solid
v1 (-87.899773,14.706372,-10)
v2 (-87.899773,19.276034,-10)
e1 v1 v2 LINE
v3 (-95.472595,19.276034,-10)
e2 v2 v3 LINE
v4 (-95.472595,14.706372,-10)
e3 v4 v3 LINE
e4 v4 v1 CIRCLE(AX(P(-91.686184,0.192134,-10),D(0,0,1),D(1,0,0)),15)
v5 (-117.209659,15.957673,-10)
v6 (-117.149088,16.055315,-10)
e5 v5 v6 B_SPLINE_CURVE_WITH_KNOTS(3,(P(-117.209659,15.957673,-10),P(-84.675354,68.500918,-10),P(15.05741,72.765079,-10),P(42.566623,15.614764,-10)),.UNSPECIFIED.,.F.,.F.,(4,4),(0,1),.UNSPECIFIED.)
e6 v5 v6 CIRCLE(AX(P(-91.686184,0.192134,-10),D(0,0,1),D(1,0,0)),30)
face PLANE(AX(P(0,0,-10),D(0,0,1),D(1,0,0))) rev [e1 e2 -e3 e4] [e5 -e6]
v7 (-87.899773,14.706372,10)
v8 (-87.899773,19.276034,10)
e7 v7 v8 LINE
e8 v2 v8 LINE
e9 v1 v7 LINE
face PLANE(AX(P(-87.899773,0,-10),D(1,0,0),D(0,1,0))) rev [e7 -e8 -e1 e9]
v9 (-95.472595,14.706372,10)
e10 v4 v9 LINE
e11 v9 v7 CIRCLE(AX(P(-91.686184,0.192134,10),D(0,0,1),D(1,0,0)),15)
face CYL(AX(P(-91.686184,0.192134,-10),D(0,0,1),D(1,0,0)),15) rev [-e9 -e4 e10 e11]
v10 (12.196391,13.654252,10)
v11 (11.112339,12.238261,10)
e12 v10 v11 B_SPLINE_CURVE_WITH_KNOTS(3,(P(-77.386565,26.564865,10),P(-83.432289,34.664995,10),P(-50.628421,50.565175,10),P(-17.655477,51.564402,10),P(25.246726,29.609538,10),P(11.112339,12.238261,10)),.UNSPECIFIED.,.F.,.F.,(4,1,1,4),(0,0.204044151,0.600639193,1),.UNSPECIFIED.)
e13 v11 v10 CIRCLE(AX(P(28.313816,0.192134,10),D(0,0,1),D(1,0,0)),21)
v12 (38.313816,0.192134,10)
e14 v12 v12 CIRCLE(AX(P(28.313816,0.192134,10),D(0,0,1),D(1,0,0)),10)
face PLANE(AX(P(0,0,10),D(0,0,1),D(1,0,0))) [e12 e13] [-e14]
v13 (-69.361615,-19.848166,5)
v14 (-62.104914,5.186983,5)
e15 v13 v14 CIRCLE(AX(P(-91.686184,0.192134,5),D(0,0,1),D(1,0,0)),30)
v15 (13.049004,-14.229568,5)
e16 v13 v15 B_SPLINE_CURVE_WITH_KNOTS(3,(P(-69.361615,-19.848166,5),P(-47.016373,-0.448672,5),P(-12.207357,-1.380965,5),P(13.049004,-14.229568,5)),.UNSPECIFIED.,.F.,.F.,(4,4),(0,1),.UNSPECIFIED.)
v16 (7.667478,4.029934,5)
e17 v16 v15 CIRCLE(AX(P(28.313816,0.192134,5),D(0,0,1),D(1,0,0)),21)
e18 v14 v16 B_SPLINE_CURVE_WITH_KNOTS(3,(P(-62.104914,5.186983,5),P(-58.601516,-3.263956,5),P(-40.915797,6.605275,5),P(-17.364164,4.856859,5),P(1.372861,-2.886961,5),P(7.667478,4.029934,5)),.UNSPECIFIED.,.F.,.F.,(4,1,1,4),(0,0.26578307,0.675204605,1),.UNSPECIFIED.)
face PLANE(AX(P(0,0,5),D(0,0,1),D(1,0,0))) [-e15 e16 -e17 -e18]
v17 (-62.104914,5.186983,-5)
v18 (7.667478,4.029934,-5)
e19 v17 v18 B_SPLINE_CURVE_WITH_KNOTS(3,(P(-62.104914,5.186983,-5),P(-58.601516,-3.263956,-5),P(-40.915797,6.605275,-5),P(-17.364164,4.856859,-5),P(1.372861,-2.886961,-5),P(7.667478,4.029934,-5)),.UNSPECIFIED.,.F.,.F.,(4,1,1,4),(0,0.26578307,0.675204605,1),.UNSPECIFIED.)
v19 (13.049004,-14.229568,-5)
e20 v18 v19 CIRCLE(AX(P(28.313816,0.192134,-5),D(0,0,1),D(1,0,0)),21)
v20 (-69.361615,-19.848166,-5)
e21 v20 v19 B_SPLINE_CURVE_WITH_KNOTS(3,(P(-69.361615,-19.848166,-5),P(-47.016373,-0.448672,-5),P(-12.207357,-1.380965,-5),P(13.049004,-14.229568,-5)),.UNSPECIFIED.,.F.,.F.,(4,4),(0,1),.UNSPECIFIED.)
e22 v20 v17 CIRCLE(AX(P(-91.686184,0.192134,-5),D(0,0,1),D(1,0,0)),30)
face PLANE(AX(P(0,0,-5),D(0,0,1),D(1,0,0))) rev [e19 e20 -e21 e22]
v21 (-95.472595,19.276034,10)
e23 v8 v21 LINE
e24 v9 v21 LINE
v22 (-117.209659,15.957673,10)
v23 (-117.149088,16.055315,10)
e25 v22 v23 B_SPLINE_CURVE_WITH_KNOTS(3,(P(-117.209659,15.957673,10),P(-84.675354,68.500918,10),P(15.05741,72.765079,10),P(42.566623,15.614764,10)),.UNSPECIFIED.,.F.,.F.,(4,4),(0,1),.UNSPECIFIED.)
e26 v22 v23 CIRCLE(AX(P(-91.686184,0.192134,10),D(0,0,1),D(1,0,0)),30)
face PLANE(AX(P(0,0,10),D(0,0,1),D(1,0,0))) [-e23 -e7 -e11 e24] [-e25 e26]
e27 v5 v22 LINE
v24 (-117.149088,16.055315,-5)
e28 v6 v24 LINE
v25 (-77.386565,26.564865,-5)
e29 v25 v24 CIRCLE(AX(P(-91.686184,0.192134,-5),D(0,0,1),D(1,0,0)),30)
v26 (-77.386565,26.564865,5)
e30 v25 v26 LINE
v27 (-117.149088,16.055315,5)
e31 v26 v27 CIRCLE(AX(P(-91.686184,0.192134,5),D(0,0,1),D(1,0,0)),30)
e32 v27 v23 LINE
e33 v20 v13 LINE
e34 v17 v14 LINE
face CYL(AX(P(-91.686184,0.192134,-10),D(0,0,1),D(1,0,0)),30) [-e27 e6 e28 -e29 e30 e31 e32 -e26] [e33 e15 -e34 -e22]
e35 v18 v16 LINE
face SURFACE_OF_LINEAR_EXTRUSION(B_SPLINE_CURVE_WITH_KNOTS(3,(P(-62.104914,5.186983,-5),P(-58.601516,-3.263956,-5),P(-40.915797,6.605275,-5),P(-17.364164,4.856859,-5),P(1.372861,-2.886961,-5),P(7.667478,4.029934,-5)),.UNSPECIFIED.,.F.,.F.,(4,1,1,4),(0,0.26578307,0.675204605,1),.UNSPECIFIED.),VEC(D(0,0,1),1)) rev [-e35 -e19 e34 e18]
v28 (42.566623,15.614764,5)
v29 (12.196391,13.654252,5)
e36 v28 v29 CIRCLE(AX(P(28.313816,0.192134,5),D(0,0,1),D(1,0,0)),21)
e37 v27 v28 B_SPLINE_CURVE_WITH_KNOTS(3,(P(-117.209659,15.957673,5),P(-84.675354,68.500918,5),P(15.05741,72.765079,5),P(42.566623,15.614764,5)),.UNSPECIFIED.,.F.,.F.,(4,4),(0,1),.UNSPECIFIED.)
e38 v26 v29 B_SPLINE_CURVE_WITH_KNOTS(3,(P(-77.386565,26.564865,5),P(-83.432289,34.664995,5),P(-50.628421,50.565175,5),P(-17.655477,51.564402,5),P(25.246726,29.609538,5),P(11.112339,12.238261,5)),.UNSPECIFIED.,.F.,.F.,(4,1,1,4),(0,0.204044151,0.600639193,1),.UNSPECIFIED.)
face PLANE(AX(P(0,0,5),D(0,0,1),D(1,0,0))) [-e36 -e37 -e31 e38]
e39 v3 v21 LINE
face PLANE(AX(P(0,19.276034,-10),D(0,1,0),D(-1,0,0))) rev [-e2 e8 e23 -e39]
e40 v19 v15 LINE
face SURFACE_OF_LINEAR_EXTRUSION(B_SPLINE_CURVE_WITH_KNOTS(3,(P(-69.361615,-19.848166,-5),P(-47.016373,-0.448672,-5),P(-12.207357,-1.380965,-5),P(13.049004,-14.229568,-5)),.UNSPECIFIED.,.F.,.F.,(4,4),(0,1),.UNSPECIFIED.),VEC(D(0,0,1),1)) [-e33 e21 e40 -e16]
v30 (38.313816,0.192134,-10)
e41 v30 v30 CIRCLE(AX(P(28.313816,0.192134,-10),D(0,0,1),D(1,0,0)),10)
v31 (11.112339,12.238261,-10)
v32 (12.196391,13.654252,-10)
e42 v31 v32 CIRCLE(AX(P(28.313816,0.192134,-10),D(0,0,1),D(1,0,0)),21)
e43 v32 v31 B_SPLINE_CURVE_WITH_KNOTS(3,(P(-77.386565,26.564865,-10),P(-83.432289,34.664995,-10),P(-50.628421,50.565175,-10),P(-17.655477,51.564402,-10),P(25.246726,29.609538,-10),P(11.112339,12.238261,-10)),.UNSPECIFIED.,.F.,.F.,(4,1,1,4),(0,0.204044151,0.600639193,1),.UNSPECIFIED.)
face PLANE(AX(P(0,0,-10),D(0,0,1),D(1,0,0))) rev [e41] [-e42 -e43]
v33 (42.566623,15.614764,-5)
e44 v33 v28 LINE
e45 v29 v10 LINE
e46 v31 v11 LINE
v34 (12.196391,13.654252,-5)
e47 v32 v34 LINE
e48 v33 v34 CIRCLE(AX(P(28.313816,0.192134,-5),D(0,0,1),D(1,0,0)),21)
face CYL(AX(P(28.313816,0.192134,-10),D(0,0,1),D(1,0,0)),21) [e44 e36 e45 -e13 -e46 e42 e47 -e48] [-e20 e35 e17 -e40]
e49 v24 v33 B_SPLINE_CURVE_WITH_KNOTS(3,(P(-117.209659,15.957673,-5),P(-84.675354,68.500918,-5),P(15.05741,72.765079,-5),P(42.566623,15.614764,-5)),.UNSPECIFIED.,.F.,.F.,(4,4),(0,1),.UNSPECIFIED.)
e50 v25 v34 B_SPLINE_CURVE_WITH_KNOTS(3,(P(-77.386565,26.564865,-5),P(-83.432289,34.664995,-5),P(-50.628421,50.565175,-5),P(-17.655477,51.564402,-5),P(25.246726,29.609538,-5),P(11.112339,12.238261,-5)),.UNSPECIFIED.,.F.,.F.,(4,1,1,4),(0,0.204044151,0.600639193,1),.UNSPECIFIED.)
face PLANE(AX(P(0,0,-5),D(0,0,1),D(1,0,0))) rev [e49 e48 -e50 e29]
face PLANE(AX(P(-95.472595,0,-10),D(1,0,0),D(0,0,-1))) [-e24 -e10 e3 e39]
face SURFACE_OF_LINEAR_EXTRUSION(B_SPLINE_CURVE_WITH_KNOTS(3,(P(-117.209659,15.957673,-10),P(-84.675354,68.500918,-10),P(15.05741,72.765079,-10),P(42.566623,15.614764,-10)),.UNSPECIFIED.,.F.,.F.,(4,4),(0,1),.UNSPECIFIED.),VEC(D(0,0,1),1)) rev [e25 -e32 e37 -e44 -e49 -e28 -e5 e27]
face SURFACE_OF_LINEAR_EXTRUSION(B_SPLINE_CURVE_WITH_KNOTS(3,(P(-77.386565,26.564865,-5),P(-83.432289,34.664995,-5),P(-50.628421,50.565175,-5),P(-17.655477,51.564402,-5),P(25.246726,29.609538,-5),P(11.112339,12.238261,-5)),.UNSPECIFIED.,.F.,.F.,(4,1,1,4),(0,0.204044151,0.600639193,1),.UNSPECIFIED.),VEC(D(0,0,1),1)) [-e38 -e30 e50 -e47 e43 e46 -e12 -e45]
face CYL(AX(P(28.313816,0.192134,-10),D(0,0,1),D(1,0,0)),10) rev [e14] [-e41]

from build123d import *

# Parameters (mm, degrees)
BOSS_EXTRUDE3_DEPTH      = 10
BOSS_EXTRUDE3_DEPTH_BACK = 10
SKETCH1_R                = 30
BOSS_EXTRUDE4_DEPTH      = 10
BOSS_EXTRUDE4_DEPTH_BACK = 10
SKETCH1_6_R              = 10
BOSS_EXTRUDE5_START      = -5
BOSS_EXTRUDE5_DEPTH      = 10
BOSS_EXTRUDE6_DEPTH      = 5
BOSS_EXTRUDE6_DEPTH_BACK = 5


# Read off the part's stored shape, not the designer's step: Boss-Extrude5
with BuildPart() as part:
    # Sketch1 → Boss-Extrude3 (new, two sides: drawn at the far end of the back side and taken through both)
    with BuildSketch(Plane.XY.offset(-BOSS_EXTRUDE3_DEPTH_BACK)):
        with Locations((-91.686183624, 0.192134417)):
            Circle(SKETCH1_R)
        with BuildLine():
            Line((-87.89977254, 14.706371948), (-87.89977254, 19.276034186))
            Line((-87.89977254, 19.276034186), (-95.472594708, 19.276034186))
            Line((-95.472594708, 19.276034186), (-95.472594708, 14.706371948))
            ThreePointArc((-95.472594708, 14.706371948), (-91.686183624, -14.807865583), (-87.89977254, 14.706371948))
        make_face(mode=Mode.SUBTRACT)
    extrude(amount=BOSS_EXTRUDE3_DEPTH + BOSS_EXTRUDE3_DEPTH_BACK)



with BuildPart() as body_2:
    # Sketch1<6> → Boss-Extrude4 (new, two sides: drawn at the far end of the back side and taken through both)
    with BuildSketch(Plane.XY.offset(-BOSS_EXTRUDE4_DEPTH_BACK)):
        with BuildLine():
            ThreePointArc((11.112339015, 12.238261455), (8.949972375, 8.318729369), (7.667477785, 4.02993363))
            ThreePointArc((7.667477785, 4.02993363), (8.170454057, -5.744611701), (13.049003536, -14.229567596))
            ThreePointArc((13.049003536, -14.229567596), (36.073936554, -19.321464298), (49.313816376, 0.192134417))
            ThreePointArc((49.313816376, 0.192134417), (47.553215185, 8.609113298), (42.566622712, 15.614764269))
            ThreePointArc((42.566622712, 15.614764269), (26.961003361, 21.148515234), (12.196391219, 13.65425187))
            add(Edge.make_bspline(
                [(12.196391219, 13.65425187), (11.861354172, 13.187034207), (11.500278102, 12.715041734), (11.112339015, 12.238261455)],
                knots=[0.989038954, 0.989038954, 0.989038954, 0.989038954, 1, 1, 1, 1], degree=3))
        make_face()
        with Locations((28.313816376, 0.192134417)):
            Circle(SKETCH1_6_R, mode=Mode.SUBTRACT)
    extrude(amount=BOSS_EXTRUDE4_DEPTH + BOSS_EXTRUDE4_DEPTH_BACK)


with BuildPart() as part_1:
    add(part.part)

    add(body_2.part)  # Boss-Extrude5 merges body 2
    # Boss-Extrude5 outline → Boss-Extrude5 (add)
    with BuildSketch(Plane.XY.offset(BOSS_EXTRUDE5_START)):
        with BuildLine():
            add(Edge.make_bspline(
                [(-117.149088001, 16.055315078), (-84.551754221, 68.506180692), (15.074459949, 72.729657691), (42.566622712, 15.614764269)],
                knots=[0.000619794, 0.000619794, 0.000619794, 0.000619794, 1, 1, 1, 1], degree=3))
            ThreePointArc((-117.149088001, 16.055315078), (-99.352173325, 29.196144551), (-77.386565231, 26.564864967))
            add(Edge.make_bspline(
                [(-77.386565231, 26.564864967), (-83.432288651, 34.664995437), (-50.628420979, 50.565174626), (-18.016895415, 51.553449374), (24.068279094, 30.209900729), (12.196391219, 13.65425187)],
                knots=[0, 0, 0, 0, 0.204044151, 0.600639193, 0.989038954, 0.989038954, 0.989038954, 0.989038954], degree=3))
            ThreePointArc((12.196391219, 13.65425187), (26.961003361, 21.148515233), (42.566622712, 15.614764269))
        make_face()
    extrude(amount=BOSS_EXTRUDE5_DEPTH)

    # Sketch1<9> → Boss-Extrude6 (add, two sides: drawn at the far end of the back side and taken through both)
    with BuildSketch(Plane.XY.offset(-BOSS_EXTRUDE6_DEPTH_BACK)):
        with BuildLine():
            ThreePointArc((-62.104914378, 5.186982743), (-61.791049594, 2.69831903), (-61.686183624, 0.192134417))
            ThreePointArc((-61.686183624, 0.192134417), (-63.670678381, -10.537798759), (-69.361614689, -19.848165527))
            add(Edge.make_bspline(
                [(-69.361614689, -19.848165527), (-47.016372637, -0.448672031), (-12.207357242, -1.380964616), (13.049003536, -14.229567596)],
                knots=[0, 0, 0, 0, 1, 1, 1, 1], degree=3))
            ThreePointArc((13.049003536, -14.229567596), (8.170454057, -5.744611701), (7.667477785, 4.02993363))
            add(Edge.make_bspline(
                [(-62.104914378, 5.186982743), (-58.601516264, -3.263955738), (-40.915796903, 6.605274961), (-17.364164136, 4.856859209), (1.372861242, -2.886960631), (7.667477785, 4.02993363)],
                knots=[0, 0, 0, 0, 0.26578307, 0.675204605, 1, 1, 1, 1], degree=3))
        make_face()
    extrude(amount=BOSS_EXTRUDE6_DEPTH + BOSS_EXTRUDE6_DEPTH_BACK)


solid = part_1.part
